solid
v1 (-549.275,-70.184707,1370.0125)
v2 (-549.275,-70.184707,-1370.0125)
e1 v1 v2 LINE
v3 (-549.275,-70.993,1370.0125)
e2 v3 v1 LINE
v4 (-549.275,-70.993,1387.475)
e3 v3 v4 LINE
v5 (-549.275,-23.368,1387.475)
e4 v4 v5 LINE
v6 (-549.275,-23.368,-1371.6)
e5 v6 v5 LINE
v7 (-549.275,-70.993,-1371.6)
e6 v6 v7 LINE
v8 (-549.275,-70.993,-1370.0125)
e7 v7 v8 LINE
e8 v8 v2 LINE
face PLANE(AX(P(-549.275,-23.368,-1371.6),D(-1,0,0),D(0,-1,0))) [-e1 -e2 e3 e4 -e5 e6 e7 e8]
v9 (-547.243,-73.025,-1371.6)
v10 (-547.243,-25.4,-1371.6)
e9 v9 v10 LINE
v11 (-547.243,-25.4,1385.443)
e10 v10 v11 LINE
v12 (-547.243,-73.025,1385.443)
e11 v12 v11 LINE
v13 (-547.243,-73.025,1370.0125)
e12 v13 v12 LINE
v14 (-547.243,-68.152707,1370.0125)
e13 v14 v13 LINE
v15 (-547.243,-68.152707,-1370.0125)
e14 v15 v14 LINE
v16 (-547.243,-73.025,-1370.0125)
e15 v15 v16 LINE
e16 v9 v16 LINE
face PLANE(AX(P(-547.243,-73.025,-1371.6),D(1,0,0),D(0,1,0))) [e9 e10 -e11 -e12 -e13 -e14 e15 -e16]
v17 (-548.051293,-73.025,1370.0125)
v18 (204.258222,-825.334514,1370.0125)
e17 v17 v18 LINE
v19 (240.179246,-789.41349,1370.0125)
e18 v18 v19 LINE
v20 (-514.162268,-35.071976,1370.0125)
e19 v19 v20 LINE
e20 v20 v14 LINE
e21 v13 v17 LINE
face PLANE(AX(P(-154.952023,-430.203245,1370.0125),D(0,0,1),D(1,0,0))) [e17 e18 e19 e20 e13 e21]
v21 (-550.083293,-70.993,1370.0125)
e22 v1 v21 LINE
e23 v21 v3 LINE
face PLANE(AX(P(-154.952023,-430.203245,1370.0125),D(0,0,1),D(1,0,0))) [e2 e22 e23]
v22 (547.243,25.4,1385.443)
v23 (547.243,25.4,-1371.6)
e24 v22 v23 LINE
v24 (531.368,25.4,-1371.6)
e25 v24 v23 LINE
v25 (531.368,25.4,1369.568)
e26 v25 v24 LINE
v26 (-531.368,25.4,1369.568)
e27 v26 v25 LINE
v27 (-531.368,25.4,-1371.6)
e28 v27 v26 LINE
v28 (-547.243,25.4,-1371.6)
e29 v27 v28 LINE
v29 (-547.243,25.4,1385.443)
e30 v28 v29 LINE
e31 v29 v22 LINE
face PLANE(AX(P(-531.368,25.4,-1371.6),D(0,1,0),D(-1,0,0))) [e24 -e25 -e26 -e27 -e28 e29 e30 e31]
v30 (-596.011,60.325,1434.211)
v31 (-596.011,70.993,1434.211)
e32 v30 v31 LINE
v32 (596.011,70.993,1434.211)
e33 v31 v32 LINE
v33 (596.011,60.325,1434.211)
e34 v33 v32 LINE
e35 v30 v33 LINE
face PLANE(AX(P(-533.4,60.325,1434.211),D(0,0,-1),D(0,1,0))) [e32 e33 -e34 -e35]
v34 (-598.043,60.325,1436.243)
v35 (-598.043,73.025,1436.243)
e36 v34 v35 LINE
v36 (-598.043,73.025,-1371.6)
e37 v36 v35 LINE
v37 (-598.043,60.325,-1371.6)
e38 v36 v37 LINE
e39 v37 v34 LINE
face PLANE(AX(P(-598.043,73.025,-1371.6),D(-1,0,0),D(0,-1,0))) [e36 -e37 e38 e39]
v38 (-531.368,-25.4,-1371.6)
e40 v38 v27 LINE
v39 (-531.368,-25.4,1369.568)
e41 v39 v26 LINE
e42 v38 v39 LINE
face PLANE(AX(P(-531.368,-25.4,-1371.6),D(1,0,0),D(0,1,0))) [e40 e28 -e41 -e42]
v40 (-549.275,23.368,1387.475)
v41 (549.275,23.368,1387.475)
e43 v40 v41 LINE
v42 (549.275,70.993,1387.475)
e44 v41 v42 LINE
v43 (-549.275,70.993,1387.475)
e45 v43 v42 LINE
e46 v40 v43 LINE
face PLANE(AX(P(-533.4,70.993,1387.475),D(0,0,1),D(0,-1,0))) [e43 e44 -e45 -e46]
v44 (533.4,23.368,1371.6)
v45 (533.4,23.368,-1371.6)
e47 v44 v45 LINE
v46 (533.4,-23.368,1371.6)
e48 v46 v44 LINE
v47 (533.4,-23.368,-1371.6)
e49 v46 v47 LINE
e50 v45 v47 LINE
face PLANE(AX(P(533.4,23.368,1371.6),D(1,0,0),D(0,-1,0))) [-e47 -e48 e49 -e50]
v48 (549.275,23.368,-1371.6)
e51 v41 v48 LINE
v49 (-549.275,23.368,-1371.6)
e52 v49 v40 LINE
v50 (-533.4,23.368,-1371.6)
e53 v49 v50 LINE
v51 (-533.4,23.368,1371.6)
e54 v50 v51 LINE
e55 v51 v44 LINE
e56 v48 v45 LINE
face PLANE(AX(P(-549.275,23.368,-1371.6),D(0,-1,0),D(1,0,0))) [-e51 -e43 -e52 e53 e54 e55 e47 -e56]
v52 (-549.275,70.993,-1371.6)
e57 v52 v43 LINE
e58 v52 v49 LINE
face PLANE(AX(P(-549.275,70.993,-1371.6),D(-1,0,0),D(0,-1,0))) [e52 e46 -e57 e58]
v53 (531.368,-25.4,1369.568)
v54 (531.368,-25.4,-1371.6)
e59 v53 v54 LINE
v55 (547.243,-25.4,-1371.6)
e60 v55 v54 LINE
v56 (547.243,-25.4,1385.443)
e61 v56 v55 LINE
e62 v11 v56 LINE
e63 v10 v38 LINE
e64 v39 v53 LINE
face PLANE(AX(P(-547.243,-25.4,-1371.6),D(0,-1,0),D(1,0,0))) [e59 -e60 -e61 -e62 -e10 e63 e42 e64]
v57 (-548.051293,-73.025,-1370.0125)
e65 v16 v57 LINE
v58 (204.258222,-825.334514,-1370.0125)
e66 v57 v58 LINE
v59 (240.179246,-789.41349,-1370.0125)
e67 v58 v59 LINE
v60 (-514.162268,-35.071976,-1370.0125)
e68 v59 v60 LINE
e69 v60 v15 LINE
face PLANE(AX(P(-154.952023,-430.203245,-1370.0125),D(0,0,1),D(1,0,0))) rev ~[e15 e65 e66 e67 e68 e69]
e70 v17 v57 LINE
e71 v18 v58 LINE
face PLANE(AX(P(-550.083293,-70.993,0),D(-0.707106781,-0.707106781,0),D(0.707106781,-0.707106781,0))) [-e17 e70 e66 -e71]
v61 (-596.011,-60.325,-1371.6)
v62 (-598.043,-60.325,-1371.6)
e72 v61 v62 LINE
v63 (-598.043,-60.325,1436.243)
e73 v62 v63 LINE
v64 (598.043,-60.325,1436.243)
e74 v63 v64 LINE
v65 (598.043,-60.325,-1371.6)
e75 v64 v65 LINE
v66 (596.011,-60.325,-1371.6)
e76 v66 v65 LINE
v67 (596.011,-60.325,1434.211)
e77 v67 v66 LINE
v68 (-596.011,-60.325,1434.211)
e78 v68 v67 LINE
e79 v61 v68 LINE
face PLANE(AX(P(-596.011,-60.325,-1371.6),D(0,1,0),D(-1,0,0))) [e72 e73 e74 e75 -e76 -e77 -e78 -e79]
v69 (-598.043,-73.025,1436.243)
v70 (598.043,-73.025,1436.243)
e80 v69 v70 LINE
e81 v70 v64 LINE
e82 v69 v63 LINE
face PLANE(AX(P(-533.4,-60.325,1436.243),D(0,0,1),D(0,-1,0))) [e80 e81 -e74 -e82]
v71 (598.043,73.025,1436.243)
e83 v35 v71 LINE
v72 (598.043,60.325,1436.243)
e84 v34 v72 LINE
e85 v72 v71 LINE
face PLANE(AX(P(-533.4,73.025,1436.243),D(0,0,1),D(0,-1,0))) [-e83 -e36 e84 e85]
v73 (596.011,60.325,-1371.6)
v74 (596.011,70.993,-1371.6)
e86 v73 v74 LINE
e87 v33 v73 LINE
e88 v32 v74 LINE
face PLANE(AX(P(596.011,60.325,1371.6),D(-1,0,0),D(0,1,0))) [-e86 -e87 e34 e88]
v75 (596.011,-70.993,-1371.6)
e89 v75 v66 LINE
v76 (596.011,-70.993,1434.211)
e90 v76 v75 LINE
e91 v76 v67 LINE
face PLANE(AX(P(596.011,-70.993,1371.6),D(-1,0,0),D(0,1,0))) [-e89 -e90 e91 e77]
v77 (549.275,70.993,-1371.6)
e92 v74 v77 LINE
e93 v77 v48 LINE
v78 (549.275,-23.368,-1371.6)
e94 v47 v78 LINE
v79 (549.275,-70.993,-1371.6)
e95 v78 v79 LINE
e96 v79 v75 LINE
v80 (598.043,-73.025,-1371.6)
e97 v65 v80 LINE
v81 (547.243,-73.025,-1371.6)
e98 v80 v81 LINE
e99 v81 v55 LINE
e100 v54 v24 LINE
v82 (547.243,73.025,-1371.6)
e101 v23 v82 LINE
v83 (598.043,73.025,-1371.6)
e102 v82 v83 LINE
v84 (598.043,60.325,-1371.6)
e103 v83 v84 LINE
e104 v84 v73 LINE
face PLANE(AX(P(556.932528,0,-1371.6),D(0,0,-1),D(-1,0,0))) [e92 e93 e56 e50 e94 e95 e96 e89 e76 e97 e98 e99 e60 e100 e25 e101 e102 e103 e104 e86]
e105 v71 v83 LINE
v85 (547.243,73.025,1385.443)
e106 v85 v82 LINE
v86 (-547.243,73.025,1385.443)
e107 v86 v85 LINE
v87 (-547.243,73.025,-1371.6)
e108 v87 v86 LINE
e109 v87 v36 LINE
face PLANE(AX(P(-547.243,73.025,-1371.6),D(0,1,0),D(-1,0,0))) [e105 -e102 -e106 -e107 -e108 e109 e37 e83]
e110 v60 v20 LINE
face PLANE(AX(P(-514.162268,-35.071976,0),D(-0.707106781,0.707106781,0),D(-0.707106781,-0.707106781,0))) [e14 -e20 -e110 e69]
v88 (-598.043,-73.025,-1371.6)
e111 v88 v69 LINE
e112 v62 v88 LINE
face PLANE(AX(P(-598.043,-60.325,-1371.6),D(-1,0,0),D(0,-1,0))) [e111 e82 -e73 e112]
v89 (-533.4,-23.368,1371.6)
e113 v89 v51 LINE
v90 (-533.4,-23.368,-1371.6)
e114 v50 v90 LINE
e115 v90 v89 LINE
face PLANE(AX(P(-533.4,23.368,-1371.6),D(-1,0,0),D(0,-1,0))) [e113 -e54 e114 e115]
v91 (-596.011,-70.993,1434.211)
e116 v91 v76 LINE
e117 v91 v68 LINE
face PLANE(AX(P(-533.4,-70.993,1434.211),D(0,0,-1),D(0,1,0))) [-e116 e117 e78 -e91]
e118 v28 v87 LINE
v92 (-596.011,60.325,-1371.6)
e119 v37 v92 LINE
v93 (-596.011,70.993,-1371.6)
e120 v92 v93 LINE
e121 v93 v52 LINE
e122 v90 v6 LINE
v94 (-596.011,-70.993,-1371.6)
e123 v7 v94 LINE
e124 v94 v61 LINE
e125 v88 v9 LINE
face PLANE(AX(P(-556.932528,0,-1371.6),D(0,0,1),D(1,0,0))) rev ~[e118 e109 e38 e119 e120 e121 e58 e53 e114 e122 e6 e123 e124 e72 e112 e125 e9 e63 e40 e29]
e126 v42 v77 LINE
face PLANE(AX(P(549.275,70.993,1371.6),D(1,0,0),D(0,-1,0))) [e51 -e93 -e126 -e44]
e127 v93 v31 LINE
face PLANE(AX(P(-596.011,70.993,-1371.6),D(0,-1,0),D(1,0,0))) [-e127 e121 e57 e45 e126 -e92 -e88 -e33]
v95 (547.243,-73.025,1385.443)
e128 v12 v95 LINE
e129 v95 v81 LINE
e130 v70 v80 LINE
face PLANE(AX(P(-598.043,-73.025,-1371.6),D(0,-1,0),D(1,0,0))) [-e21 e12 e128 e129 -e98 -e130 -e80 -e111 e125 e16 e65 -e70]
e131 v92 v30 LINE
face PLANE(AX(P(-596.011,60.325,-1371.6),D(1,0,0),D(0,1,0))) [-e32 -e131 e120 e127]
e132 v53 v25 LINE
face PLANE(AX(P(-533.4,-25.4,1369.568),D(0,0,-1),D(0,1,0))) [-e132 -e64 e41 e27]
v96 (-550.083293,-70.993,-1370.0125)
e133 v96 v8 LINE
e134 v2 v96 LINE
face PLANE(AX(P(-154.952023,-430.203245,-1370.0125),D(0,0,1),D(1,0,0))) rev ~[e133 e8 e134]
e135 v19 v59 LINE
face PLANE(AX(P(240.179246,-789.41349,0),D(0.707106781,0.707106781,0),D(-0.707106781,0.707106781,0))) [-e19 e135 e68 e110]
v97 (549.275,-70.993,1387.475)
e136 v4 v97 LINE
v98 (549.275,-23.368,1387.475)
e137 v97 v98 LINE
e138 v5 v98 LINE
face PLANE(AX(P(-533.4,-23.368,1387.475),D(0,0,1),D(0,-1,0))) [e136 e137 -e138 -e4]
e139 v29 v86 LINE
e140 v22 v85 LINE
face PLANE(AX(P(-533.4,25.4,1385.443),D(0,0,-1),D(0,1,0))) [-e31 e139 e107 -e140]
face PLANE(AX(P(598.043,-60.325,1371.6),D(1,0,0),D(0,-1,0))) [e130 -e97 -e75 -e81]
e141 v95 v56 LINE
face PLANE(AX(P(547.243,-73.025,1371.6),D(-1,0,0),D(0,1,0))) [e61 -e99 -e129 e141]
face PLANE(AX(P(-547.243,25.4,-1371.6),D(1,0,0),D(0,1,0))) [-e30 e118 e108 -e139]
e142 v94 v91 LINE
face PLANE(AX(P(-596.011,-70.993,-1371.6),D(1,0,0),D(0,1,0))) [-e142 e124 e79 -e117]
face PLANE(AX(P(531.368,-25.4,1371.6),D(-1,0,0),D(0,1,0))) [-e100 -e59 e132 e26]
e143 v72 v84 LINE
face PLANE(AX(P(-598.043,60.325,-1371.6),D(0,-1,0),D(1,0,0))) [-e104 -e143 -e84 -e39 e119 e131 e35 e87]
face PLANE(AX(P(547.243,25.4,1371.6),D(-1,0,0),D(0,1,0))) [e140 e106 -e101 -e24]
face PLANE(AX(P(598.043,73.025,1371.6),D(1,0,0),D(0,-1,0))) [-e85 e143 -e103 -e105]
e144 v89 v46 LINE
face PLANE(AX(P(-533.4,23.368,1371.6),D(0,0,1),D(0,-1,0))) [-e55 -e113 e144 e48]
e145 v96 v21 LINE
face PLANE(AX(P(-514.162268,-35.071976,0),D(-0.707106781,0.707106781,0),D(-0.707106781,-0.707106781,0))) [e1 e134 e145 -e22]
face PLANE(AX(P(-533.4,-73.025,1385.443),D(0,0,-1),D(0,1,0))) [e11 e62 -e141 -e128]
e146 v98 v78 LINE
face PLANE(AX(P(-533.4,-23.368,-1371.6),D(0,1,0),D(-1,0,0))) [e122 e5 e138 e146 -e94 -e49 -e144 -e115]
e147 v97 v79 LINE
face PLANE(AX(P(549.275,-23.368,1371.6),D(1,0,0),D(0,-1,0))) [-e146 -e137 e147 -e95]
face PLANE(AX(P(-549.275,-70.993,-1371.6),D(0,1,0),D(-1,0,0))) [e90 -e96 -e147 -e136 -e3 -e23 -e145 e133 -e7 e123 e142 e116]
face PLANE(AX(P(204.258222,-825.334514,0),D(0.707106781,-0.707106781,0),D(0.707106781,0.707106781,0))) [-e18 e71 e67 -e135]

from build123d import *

# Parameters (mm, degrees)
F5_DEPTH = 1370.0125


# Not quite as in the source:
# - a variable given as a bare number and used for a length is read in inches; the dataset says mm whatever the document's units were


with BuildPart() as f3:
    # F3: sweep along a path in F1
    with BuildLine(Plane.XZ) as f3_path:
        Line((-533.4, -1371.6), (-533.4, 1371.6))
        Line((-533.4, 1371.6), (533.4, 1371.6))
        Line((533.4, 1371.6), (533.4, -1371.6))
    # F2 (on Top) → F3 (sweep)
    with BuildSketch(Plane.XY):
        Polygon((-549.275, 23.368), (-533.4, 23.368), (-533.4, -23.368), (-549.275, -23.368), (-549.275, -70.993), (-596.011, -70.993), (-596.011, -60.325), (-598.043, -60.325), (-598.043, -73.025), (-547.243, -73.025), (-547.243, -25.4), (-531.368, -25.4), (-531.368, 25.4), (-547.243, 25.4), (-547.243, 73.025), (-598.043, 73.025), (-598.043, 60.325), (-596.011, 60.325), (-596.011, 70.993), (-549.275, 70.993), align=None)
    sweep(path=f3_path.line, transition=Transition.RIGHT)

    # F4 (on Top) → F5 (join, symmetric)
    with BuildSketch(Plane.XY):
        Polygon((240.1792460268, -789.4134896855), (-514.1622681431, -35.0719755157), (-550.0832926273, -70.993), (204.2582215425, -825.3345141698), align=None)
    extrude(amount=F5_DEPTH, both=True)


solid = f3.part
